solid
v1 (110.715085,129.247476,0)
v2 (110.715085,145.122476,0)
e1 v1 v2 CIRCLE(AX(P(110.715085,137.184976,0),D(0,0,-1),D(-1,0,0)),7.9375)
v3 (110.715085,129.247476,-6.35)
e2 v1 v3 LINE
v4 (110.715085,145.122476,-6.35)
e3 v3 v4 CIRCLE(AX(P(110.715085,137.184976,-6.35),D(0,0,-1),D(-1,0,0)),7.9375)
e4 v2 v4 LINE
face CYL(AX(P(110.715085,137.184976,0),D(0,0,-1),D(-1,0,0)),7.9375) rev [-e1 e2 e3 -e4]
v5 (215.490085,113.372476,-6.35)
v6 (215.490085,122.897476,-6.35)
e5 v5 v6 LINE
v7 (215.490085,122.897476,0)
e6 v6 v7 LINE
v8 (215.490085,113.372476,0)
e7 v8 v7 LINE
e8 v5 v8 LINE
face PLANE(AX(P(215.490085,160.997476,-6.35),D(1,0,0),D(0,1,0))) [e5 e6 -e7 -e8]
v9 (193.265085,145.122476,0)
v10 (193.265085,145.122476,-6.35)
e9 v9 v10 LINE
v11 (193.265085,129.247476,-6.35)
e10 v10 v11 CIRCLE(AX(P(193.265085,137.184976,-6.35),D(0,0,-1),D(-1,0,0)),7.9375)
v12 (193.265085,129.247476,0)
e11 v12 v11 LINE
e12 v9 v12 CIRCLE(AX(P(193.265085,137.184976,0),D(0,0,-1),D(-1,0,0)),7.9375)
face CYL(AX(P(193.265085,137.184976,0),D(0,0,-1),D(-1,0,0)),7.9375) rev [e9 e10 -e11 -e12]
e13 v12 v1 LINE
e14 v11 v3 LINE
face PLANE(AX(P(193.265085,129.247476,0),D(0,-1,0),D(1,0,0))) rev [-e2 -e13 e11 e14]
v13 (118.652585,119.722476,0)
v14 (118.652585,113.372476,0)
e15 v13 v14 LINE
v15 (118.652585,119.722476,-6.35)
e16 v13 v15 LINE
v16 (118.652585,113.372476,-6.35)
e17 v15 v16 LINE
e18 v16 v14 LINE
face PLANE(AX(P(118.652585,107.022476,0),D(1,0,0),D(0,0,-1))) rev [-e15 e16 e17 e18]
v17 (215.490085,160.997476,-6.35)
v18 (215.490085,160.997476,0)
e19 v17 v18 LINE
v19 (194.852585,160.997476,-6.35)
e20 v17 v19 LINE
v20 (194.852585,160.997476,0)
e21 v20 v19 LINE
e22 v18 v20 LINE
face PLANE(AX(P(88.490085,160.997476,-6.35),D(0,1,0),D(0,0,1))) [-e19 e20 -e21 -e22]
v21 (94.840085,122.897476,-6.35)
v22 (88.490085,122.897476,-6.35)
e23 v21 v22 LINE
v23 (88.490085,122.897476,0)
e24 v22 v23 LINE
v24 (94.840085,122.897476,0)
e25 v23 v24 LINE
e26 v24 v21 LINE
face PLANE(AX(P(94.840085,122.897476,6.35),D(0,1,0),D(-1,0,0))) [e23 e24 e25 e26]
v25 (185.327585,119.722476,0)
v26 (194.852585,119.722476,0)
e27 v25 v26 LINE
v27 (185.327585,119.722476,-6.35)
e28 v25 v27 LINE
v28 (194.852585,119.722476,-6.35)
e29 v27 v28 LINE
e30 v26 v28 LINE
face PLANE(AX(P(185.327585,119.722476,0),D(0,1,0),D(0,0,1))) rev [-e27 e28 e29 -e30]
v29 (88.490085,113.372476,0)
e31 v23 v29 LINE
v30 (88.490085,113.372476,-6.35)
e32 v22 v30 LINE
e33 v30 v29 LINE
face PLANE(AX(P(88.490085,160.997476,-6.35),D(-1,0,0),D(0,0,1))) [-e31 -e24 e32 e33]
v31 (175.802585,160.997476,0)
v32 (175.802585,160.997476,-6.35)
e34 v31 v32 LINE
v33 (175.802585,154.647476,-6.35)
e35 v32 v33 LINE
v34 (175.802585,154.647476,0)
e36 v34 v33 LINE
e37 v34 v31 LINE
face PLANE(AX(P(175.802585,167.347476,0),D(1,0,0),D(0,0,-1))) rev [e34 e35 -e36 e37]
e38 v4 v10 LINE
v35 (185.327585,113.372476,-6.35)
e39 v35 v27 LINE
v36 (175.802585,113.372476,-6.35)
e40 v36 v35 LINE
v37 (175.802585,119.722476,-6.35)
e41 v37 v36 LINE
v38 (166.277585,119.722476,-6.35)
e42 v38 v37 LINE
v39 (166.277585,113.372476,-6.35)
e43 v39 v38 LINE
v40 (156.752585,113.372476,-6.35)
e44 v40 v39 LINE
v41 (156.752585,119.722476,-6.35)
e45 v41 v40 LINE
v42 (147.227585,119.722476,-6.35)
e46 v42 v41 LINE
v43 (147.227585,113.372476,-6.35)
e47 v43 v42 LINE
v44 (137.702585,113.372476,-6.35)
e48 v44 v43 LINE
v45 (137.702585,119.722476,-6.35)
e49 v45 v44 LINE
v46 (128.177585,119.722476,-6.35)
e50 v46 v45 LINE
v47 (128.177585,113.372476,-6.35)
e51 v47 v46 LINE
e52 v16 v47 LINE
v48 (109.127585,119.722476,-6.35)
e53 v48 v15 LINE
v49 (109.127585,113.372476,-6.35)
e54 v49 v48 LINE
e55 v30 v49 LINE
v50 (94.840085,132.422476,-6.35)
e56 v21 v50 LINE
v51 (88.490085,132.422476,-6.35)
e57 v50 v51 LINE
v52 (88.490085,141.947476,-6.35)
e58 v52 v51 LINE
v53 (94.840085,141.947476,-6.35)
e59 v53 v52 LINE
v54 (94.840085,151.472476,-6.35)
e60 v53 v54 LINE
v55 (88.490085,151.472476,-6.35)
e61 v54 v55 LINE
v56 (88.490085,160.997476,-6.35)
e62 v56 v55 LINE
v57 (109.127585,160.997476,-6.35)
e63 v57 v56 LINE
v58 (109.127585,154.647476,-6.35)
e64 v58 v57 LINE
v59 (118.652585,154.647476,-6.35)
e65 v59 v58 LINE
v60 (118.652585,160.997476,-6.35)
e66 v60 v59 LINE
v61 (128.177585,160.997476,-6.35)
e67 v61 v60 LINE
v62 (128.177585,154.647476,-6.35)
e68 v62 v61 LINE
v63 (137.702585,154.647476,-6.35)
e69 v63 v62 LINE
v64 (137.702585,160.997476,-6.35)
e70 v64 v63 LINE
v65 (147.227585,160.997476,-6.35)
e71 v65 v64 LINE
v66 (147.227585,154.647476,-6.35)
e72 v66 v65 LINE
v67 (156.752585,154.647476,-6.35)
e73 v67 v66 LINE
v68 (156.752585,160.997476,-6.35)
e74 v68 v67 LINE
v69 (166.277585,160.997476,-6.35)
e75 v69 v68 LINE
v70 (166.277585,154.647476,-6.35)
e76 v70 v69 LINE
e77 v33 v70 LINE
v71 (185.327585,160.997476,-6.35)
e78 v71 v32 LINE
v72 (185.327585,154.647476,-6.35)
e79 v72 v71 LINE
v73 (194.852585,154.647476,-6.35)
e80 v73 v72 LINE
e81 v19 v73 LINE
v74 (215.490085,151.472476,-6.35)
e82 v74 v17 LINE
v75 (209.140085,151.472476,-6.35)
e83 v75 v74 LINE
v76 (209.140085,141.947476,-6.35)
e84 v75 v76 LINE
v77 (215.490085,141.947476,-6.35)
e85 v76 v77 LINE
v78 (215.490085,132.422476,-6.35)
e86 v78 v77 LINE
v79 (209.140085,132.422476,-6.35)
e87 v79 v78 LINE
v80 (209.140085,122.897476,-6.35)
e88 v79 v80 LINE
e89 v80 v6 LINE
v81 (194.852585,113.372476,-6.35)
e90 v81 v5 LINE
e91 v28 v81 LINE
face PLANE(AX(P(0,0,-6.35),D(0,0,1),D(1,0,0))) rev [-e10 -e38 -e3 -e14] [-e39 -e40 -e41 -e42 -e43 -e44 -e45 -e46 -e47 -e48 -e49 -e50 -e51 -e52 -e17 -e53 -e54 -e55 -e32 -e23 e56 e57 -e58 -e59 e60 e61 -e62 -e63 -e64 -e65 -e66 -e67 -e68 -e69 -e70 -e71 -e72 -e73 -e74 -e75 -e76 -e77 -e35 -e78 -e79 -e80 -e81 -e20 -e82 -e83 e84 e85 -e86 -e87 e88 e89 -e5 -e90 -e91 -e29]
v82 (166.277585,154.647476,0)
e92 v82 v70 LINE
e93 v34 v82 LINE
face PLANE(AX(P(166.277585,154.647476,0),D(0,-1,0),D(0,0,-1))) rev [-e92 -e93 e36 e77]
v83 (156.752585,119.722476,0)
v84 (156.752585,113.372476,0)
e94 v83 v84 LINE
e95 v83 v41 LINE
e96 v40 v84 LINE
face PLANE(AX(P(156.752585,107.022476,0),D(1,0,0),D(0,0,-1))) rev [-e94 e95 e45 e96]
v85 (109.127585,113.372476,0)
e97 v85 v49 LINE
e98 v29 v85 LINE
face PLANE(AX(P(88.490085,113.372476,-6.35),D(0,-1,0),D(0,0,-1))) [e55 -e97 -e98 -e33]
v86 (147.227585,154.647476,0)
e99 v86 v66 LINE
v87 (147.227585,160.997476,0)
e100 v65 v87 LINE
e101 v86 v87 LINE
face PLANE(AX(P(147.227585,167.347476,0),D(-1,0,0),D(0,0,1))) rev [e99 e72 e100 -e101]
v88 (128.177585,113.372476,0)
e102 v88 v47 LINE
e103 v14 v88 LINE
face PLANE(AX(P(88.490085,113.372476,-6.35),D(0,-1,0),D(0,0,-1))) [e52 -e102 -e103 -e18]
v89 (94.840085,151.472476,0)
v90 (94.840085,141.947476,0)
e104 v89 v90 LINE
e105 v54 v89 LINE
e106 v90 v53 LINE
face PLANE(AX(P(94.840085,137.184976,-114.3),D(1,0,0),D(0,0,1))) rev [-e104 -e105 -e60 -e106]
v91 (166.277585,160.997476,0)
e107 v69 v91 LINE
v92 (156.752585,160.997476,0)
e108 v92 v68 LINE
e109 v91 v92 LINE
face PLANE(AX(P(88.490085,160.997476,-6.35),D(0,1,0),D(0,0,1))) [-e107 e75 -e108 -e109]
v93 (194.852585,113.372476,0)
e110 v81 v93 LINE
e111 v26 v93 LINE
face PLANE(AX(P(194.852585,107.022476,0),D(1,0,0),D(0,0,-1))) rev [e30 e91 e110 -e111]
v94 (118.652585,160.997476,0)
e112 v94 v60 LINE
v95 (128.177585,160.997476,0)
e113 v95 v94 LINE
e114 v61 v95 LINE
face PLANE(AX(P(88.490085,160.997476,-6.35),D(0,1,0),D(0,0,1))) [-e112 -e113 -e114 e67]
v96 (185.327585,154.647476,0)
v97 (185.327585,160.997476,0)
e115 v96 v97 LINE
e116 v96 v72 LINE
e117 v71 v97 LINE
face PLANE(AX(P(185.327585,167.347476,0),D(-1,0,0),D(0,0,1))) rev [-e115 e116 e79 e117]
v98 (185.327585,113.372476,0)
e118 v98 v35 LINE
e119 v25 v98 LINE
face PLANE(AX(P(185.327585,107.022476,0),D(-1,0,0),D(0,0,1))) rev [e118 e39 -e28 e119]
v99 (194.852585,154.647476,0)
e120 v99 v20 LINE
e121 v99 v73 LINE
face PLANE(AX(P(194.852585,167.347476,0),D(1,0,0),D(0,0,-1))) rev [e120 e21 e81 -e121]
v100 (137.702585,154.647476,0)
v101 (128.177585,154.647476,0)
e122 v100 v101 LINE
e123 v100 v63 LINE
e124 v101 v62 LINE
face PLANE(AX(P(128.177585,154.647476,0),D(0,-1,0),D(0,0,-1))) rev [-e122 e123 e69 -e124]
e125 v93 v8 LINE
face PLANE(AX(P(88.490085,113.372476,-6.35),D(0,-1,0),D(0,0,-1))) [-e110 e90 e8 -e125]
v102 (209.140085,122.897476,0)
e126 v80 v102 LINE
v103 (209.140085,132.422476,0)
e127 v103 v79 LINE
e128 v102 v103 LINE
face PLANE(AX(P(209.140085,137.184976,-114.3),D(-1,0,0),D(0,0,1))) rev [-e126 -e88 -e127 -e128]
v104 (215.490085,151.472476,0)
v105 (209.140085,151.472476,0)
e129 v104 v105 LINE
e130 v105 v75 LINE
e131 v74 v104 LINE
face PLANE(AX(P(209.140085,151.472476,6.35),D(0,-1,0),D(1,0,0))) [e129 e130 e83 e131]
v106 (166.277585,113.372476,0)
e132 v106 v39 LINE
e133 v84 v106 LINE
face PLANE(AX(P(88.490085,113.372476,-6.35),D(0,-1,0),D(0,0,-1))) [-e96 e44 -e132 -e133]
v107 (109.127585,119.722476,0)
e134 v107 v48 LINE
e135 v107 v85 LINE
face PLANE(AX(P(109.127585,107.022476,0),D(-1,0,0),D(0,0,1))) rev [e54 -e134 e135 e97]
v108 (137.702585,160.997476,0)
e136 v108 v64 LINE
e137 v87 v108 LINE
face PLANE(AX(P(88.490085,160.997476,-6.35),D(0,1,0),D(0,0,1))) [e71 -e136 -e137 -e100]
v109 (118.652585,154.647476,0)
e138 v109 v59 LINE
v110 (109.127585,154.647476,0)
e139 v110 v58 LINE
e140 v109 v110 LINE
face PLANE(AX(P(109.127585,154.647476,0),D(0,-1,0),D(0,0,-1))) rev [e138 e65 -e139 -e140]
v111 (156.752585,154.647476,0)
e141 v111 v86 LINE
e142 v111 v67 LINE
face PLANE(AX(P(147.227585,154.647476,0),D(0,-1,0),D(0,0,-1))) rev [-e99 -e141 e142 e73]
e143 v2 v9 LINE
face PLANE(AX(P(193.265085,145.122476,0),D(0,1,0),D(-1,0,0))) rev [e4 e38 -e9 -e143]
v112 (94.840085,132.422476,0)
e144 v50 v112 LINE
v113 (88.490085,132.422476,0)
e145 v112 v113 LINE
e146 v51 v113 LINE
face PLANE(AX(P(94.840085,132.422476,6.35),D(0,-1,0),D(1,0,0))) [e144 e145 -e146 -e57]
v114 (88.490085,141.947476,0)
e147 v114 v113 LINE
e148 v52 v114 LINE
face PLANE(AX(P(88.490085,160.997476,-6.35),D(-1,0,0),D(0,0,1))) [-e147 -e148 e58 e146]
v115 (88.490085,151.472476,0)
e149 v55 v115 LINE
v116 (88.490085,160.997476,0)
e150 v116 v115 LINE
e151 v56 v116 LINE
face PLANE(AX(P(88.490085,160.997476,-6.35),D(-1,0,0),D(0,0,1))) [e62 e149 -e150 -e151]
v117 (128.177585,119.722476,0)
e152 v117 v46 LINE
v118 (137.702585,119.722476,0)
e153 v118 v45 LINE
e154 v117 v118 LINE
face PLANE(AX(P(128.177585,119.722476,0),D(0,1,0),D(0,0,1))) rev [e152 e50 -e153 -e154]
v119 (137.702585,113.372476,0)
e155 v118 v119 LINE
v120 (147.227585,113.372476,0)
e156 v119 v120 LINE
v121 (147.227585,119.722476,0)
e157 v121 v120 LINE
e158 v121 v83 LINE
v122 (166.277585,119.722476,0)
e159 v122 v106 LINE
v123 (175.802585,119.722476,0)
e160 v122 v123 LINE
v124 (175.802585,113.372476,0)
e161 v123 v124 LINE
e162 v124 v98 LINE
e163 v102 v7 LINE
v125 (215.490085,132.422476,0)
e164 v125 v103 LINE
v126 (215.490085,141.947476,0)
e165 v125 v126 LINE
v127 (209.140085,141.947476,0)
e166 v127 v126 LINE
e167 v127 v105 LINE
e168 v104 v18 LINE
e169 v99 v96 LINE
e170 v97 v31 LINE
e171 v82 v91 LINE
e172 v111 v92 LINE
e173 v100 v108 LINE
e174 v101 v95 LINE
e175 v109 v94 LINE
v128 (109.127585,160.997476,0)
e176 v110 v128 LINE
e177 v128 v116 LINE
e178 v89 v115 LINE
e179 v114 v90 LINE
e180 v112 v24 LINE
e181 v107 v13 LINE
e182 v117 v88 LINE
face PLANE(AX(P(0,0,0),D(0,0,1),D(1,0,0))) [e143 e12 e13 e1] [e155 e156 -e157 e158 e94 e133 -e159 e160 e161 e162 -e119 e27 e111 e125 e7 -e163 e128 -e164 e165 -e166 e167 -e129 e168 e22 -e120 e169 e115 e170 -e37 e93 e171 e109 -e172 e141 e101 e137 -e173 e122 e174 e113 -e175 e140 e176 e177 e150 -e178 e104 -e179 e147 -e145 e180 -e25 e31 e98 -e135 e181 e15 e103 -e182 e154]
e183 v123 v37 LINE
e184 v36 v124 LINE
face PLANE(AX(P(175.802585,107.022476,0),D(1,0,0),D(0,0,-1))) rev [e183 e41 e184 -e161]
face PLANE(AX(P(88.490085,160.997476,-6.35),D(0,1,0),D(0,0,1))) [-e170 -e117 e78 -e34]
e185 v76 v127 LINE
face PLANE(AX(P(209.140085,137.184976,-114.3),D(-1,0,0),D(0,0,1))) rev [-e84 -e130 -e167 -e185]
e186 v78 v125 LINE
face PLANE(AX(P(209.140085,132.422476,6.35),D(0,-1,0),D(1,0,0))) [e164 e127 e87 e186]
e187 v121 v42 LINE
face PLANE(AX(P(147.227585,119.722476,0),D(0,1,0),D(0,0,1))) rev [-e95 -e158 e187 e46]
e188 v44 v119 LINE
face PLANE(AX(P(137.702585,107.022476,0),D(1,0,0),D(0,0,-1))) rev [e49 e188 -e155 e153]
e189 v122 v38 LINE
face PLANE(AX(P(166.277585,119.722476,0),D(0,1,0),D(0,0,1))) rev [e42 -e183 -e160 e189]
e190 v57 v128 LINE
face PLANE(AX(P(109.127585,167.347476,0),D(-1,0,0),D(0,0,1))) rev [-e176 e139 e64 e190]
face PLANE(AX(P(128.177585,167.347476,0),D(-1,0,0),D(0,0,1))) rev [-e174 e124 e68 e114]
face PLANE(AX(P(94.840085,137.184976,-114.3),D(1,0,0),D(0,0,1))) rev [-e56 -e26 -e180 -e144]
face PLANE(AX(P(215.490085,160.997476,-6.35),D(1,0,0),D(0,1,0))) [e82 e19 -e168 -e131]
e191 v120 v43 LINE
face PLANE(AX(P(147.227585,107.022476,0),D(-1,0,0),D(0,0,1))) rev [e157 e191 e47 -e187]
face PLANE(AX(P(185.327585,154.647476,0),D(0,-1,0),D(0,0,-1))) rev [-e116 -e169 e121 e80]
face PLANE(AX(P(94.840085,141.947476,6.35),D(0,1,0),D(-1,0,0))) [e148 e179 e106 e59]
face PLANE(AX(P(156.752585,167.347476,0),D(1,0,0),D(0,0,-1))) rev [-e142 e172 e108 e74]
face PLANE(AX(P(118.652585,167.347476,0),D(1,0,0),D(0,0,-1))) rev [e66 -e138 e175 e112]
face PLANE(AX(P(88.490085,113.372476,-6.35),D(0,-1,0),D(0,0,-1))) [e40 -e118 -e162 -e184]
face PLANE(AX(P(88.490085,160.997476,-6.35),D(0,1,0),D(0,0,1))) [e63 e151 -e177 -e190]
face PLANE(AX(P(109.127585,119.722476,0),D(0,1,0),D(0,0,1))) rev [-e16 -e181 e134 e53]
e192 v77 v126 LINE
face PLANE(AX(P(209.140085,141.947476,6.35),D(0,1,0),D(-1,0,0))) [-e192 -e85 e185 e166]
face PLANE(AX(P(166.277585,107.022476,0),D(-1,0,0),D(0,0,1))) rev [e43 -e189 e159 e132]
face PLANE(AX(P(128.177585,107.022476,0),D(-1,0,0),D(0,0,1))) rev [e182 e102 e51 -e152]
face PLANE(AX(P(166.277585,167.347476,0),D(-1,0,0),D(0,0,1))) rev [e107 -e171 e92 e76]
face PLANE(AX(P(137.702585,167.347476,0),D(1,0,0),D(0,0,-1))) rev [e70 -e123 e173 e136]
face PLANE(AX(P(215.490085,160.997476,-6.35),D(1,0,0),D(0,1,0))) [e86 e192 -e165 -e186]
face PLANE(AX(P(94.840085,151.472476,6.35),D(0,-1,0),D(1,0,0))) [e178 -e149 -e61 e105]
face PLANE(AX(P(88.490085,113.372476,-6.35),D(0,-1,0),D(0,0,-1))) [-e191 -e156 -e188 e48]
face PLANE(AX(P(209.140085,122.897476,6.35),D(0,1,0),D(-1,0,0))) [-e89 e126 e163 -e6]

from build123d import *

# Parameters (mm, degrees)
SKETCH1_W           = 127
SKETCH1_H           = 47.625
BOSS_EXTRUDE1_DEPTH = 6.35
SKETCH2_W           = 9.525
SKETCH2_H           = 12.7
CUT_EXTRUDE1_DEPTH  = 270.065952098
LPATTERN1_COUNT     = 3
LPATTERN1_PITCH     = 19.05
LPATTERN1_COL_COUNT = 3
LPATTERN1_COL_PITCH = 19.05
CUT_EXTRUDE3_DEPTH  = 270.065952098
CAVITY1_START       = 122.897475598
CAVITY1_OUTLINE_W   = 6.35
CAVITY1_OUTLINE_H   = 6.35
CAVITY1_DEPTH       = 9.525
CAVITY1_START_2     = 141.947475598
CAVITY1_2_OUTLINE_W = 6.35
CAVITY1_2_OUTLINE_H = 6.35
CAVITY1_2_DEPTH     = 9.525


# Read off the part's stored shape, not the designer's step: Cavity1
with BuildPart() as part:
    # Sketch1 → Boss-Extrude1 (new body)
    with BuildSketch(Plane.XY):
        with Locations((151.990085455, 137.184975598)):
            Rectangle(SKETCH1_W, SKETCH1_H)
    extrude(amount=-BOSS_EXTRUDE1_DEPTH)

    # Sketch2 → Cut-Extrude1 (cut, through all)
    with BuildSketch(Plane(origin=(0, 0, -6.35), x_dir=(-1, 0, 0), z_dir=(0, 0, -1))):
        with Locations((-151.990085455, 160.997475598)):
            Rectangle(SKETCH2_W, SKETCH2_H)
        with Locations((-151.990085455, 113.372475598)):
            Rectangle(SKETCH2_W, SKETCH2_H)
    cut_extrude1 = extrude(amount=-CUT_EXTRUDE1_DEPTH, mode=Mode.SUBTRACT)

    # LPattern1: Cut-Extrude1 ×3
    with Locations(*[(-i * LPATTERN1_PITCH, 0, 0) for i in range(1, LPATTERN1_COUNT)]):
        add(cut_extrude1, mode=Mode.SUBTRACT)

    # LPattern1 col: Cut-Extrude1 ×3
    with Locations(*[(i * LPATTERN1_COL_PITCH, 0, 0) for i in range(1, LPATTERN1_COL_COUNT)]):
        add(cut_extrude1, mode=Mode.SUBTRACT)

    # Sketch3 → Cut-Extrude3 (cut, through all)
    with BuildSketch(Plane(origin=(0, 0, -6.35), x_dir=(-1, 0, 0), z_dir=(0, 0, -1))):
        with BuildLine():
            Line((-193.265085455, 145.122475598), (-110.715085455, 145.122475598))
            ThreePointArc((-110.715085455, 145.122475598), (-102.777585455, 137.184975598), (-110.715085455, 129.247475598))
            Line((-110.715085455, 129.247475598), (-193.265085455, 129.247475598))
            ThreePointArc((-193.265085455, 129.247475598), (-201.202585455, 137.184975598), (-193.265085455, 145.122475598))
        make_face()
    extrude(amount=-CUT_EXTRUDE3_DEPTH, mode=Mode.SUBTRACT)

    # Cavity1 outline → Cavity1 (cut)
    with BuildSketch(Plane(origin=(0, 0, 0), x_dir=(1, 0, 0), z_dir=(0, 1, 0)).offset(CAVITY1_START)):
        with Locations((91.665085455, 3.175)):
            Rectangle(CAVITY1_OUTLINE_W, CAVITY1_OUTLINE_H)
        with Locations((212.315085455, 3.175)):
            Rectangle(CAVITY1_OUTLINE_W, CAVITY1_OUTLINE_H)
    extrude(amount=CAVITY1_DEPTH, mode=Mode.SUBTRACT)

    # Cavity1 2 outline → Cavity1 2 (cut)
    with BuildSketch(Plane(origin=(0, 0, 0), x_dir=(1, 0, 0), z_dir=(0, 1, 0)).offset(CAVITY1_START_2)):
        with Locations((91.665085455, 3.175)):
            Rectangle(CAVITY1_2_OUTLINE_W, CAVITY1_2_OUTLINE_H)
        with Locations((212.315085455, 3.175)):
            Rectangle(CAVITY1_2_OUTLINE_W, CAVITY1_2_OUTLINE_H)
    extrude(amount=CAVITY1_2_DEPTH, mode=Mode.SUBTRACT)


solid = part.part
